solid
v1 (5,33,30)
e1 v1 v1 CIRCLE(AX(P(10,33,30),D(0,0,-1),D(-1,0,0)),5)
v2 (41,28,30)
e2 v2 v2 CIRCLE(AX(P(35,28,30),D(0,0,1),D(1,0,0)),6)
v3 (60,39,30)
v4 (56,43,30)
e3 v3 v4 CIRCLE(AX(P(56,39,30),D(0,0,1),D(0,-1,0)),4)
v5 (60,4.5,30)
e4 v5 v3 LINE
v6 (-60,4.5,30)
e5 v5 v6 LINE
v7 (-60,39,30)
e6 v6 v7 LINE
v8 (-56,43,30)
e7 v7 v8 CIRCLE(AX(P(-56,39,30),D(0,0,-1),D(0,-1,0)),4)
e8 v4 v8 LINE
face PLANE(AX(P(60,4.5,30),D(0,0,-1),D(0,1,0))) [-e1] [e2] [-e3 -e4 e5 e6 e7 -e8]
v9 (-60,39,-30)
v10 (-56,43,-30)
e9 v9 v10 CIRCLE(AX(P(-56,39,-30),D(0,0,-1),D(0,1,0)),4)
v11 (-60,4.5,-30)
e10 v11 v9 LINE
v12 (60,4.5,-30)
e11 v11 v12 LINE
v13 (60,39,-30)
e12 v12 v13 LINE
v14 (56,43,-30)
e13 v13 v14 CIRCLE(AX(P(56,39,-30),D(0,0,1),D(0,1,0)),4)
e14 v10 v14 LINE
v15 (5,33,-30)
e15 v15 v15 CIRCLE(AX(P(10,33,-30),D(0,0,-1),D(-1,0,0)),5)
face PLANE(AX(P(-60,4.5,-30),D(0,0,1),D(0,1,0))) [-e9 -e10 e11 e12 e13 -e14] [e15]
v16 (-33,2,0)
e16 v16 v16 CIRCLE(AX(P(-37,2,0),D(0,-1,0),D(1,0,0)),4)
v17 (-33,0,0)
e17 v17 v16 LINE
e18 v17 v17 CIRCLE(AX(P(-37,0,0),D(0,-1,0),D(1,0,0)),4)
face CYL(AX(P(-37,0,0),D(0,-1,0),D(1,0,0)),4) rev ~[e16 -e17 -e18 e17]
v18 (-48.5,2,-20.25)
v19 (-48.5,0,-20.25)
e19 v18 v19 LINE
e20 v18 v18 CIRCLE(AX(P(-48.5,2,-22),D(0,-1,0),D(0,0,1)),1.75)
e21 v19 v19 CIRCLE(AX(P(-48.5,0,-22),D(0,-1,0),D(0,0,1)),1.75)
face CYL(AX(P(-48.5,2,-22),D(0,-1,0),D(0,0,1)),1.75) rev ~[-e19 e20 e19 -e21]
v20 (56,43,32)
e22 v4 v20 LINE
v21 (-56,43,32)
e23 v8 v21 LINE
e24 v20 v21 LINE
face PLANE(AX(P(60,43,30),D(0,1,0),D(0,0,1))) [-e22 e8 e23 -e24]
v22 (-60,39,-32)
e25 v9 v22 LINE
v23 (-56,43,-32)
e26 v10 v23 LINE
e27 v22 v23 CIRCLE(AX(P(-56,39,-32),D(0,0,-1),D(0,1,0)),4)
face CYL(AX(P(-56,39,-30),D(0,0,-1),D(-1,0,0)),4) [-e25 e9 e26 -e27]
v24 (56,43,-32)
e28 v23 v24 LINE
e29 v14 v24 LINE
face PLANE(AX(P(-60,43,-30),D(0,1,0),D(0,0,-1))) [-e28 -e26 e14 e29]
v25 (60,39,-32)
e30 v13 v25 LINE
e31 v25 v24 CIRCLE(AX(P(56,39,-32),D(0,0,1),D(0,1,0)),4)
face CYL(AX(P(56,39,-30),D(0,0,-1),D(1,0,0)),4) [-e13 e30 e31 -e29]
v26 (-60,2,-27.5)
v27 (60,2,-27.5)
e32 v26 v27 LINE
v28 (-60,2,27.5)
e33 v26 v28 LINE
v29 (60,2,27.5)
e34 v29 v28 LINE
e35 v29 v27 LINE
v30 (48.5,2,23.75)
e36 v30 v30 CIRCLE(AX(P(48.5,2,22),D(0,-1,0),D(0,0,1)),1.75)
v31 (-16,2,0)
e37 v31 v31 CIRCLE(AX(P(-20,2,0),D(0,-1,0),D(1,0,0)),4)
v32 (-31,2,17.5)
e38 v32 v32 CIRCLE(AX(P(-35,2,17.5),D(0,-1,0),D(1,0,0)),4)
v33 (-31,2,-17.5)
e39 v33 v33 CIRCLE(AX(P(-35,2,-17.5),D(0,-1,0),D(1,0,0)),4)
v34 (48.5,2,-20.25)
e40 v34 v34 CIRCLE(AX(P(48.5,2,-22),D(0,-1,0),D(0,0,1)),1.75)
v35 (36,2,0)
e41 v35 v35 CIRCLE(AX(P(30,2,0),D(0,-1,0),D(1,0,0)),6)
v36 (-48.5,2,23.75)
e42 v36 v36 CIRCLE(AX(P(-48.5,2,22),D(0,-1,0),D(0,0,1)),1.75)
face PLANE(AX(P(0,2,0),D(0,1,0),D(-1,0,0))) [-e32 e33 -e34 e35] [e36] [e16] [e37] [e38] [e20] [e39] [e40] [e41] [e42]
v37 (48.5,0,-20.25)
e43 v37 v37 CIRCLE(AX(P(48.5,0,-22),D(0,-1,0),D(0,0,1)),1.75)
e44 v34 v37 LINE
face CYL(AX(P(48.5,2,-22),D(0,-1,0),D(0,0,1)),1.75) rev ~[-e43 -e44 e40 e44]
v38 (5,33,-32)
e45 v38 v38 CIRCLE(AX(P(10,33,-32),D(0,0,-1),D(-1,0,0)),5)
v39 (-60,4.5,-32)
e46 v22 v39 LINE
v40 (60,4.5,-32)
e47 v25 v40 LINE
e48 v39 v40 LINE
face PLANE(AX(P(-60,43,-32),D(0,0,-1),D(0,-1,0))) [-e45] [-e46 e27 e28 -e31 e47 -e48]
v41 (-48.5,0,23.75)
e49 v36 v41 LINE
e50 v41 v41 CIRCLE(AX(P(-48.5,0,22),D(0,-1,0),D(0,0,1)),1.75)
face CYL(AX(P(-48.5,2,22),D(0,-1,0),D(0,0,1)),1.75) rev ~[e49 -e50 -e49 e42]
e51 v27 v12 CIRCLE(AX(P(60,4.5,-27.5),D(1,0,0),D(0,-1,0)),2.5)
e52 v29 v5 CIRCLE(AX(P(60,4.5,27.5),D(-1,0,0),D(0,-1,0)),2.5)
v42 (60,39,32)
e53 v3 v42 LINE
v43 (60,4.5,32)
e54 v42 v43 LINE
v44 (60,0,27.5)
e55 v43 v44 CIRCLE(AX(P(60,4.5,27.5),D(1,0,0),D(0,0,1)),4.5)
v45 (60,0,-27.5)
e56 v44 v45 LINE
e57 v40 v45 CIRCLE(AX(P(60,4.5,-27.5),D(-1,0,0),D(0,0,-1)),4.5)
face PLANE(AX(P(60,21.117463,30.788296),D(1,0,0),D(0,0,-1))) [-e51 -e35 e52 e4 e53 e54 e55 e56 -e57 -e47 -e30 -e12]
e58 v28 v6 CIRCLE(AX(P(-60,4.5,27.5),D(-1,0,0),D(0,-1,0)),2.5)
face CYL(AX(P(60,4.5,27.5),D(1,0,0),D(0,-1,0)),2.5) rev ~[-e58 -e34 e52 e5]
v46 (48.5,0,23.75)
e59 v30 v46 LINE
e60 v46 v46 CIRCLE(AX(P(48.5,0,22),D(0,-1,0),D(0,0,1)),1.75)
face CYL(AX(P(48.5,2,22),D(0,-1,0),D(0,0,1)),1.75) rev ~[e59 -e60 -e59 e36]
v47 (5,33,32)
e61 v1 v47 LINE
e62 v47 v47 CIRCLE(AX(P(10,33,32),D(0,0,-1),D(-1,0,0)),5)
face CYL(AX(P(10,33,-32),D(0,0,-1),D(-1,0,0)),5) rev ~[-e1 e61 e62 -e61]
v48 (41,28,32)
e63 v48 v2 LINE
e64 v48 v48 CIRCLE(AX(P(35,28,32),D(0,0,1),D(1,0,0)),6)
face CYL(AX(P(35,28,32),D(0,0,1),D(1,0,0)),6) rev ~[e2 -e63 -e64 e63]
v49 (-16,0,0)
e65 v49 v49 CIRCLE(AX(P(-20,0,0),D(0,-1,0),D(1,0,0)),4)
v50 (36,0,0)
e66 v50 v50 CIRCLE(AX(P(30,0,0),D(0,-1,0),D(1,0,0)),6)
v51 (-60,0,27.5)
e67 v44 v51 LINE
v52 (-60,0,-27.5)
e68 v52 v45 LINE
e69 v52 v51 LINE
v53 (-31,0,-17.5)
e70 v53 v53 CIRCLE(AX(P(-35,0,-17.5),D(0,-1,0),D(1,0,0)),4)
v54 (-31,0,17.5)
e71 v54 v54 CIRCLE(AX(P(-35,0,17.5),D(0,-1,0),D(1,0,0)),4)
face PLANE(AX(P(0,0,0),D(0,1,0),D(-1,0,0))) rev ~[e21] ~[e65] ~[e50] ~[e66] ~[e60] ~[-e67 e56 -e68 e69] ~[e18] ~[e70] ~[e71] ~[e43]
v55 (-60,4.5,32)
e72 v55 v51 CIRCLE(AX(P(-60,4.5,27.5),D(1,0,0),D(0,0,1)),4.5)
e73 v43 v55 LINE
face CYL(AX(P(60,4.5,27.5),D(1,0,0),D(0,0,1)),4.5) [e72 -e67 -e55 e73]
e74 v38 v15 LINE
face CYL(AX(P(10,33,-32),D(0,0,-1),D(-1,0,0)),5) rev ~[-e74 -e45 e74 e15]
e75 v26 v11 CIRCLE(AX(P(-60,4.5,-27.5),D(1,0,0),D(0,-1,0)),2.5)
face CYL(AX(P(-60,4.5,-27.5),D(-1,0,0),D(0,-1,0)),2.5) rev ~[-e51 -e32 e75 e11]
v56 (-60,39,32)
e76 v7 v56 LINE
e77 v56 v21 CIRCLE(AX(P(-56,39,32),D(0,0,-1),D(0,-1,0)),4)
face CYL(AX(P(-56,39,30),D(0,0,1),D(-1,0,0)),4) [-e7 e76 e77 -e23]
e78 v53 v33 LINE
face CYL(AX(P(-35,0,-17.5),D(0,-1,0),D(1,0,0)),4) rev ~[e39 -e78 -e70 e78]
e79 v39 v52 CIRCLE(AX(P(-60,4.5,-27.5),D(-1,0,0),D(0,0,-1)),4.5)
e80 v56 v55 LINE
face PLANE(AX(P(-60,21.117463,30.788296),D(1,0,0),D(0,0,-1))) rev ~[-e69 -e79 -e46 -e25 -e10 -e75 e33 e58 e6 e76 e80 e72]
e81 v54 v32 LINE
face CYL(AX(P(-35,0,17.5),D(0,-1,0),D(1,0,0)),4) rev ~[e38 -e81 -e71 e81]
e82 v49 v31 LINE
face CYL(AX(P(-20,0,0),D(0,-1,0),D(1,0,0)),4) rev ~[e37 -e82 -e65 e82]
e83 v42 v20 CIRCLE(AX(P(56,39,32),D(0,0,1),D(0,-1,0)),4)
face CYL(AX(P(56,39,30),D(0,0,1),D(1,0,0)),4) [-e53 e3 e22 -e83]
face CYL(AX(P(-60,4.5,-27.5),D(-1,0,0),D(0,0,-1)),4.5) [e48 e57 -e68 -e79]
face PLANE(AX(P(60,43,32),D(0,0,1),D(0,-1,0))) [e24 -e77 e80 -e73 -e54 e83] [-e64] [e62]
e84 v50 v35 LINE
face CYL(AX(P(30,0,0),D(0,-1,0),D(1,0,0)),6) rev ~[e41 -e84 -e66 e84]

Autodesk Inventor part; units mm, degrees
ref_plane "YZ Plane" through (0, 0, 0) normal (1, 0, 0) x (0, 1, 0)
ref_plane "XZ Plane" through (0, 0, 0) normal (0, 1, 0) x (-1, 0, 0)
ref_plane "XY Plane" through (0, 0, 0) normal (0, 0, 1) x (1, 0, 0)
sketch "Szkic1" plane through (0, 0, 0) normal (0, 1, 0) x (-1, 0, 0)
  line L0 (-60, -30) -> (60, -30)
  line L1 (60, -30) -> (60, 30)
  line L2 (60, 30) -> (-60, 30)
  line L3 (-60, 30) -> (-60, -30)
  line L4 (-60, -30) -> (60, 30) construction
  line L5 (60, -30) -> (-60, 30) construction
  point P0 (0, 0)
  dimension "d0" = 120
  dimension "d1" = 60
extrude "Płyta1" add sketch "Szkic1" along normal blind 2
sketch "Szkic2" plane through (60, 2, 30) normal (0, 0, 1) x (1, 0, 0)
  line L0 (-120, 0) -> (0, 0)
  line L1 (0, 0) -> (0, 41)
  line L2 (0, 41) -> (-120, 41)
  line L3 (-120, 41) -> (-120, 0)
edge flange "Kołnierz1" height 43 angle 90 thickness 2 bend radius 2.5 thickness toward (0, 0, 1) relief tear relief width 2 relief depth 1 corner gap 2 corner form 0 edges at (0, 2, 30) (0, 2, -30) wall of the first edge with corners at (-60, 2, 30) (60, 2, 30) (60, 43, 30) (-60, 43, 30)
bend "Zagięcie1"
corner "Narożnik1"
sketch "Szkic3" plane through (0, 2, 0) normal (0, 1, 0) x (1, 0, 0)
  circle A0 centre (48.5, 22) radius 1.2295 projected
  circle A1 centre (48.5, -22) radius 1.2295 projected
  circle A2 centre (-48.5, 22) radius 1.2295 projected
  circle A3 centre (-48.5, -22) radius 1.2295 projected
  point P0 (0, 0)
hole "Otwór1" at (48.5, 2, -22) at (48.5, 2, 22) at (-48.5, 2, -22) at (-48.5, 2, 22) direction (0, -1, 0) diameter 3.5 depth 2 tip angle 118 clearance for "Śruba ze łbem płaskim obrobiona" size "M3" standard "ANSI Profil metryczny M"
fillet "Zaokrąglenie1" radius 4 4 edges at (-60, 43, -31) (-60, 43, 31) (60, 43, 31) (60, 43, -31)
sketch "Szkic4" plane through (0, 0, 0) normal (0, -1, 0) x (1, 0, 0)
  circle A0 centre (-20, 0) radius 4
  circle A1 centre (-35, 17.5) radius 4
  circle A2 centre (-35, -17.5) radius 4
  line L0 (-60, -27.5) -> (-60, 27.5) projected
  point P0 (0, 0)
  dimension "d22" = 35
  dimension "d23" = 17.5
  dimension "d24" = 15
  dimension "d25" = 8
  dimension "d26" = 25
extrude "Wytnij1" cut sketch "Szkic4" against normal blind 2
sketch "Szkic5" plane through (0, 0, 0) normal (0, -1, 0) x (1, 0, 0)
  circle A0 centre (30, 0) radius 6
  line L0 (60, 27.5) -> (60, -27.5) projected
  point P0 (0, 0)
  point P1 (60, 0)
  dimension "d29" = 12
  dimension "d30" = 30
extrude "Wytnij2" cut sketch "Szkic5" against normal blind 2
sketch "Szkic6" plane through (60, 4.5, -32) normal (0, 0, -1) x (-1, 0, 0)
  circle A0 centre (50, 28.5) radius 5
  line L0 (4, 38.5) -> (116, 38.5) projected
  line L1 (0, 0) -> (0, 34.5) projected
  point P0 (60, -4.5)
  dimension "d33" = 10
  dimension "d34" = 10
  dimension "d35" = 50
extrude "Wytnij3" cut sketch "Szkic6" against normal through all
sketch "Szkic7" plane through (0, 0, 0) normal (0, -1, 0) x (1, 0, 0)
  circle A0 centre (-37, 0) radius 4
  line L0 (-60, -27.5) -> (-60, 27.5) projected
  point P0 (0, 0)
  point P1 (-60, 0)
  dimension "d38" = 8
  dimension "d39" = 23
extrude "Wytnij4" cut sketch "Szkic7" against normal blind 2
sketch "Szkic8" plane through (-60, 4.5, 32) normal (0, 0, 1) x (1, 0, 0)
  circle A0 centre (95, 23.5) radius 6
  line L0 (120, 34.5) -> (120, 0) projected
  circle A1 centre (70, 28.5) radius 5 projected
  line L1 (4, 38.5) -> (116, 38.5) projected
  point P0 (60, -4.5)
  dimension "d42" = 12
  dimension "d43" = 25
  dimension "d46" = 15
extrude "Wytnij5" cut sketch "Szkic8" against normal blind 2 contours A0
equation "\"d19\" = Grubość"
equation "\"d23\" = 0.5 * d22"
equation "\"d27\" = Grubość"
equation "\"d31\" = Grubość"
equation "\"d36\" = Grubość"
equation "\"d40\" = Grubość"
equation "\"d44\" = Grubość"
equation "\"d2\" = Grubość"
equation "\"d3\" = SzerokośćGięciaPodcięcia"
equation "\"d4\" = GłębokośćGięciaPodcięcia"
equation "\"d5\" = MinimalnaPozostałość"
equation "\"d6\" = PromieńPrzejścia"
equation "\"d10\" = RozmiarPodcięciaNarożnika"
equation "\"d11\" = Wielk_odstępu"
equation "\"d12\" = Rozmiar_promienia_Jacobiego"
equation "\"PromieńGięcia\" = Grubość"
equation "\"SzerokośćGięciaPodcięcia\" = Grubość"
equation "\"GłębokośćGięciaPodcięcia\" = 0.5 * Grubość"
equation "\"RozmiarPodcięciaNarożnika\" = 4 * Grubość"
equation "\"MinimalnaPozostałość\" = 2 * Grubość"
equation "\"PromieńPrzejścia\" = PromieńGięcia"
equation "\"Rozmiar_promienia_Jacobiego\" = PromieńGięcia"
equation "\"Wielk_odstępu\" = Grubość"
equation "\"Grubość\" = 2"
properties part number "dekiel" material "Stal"
